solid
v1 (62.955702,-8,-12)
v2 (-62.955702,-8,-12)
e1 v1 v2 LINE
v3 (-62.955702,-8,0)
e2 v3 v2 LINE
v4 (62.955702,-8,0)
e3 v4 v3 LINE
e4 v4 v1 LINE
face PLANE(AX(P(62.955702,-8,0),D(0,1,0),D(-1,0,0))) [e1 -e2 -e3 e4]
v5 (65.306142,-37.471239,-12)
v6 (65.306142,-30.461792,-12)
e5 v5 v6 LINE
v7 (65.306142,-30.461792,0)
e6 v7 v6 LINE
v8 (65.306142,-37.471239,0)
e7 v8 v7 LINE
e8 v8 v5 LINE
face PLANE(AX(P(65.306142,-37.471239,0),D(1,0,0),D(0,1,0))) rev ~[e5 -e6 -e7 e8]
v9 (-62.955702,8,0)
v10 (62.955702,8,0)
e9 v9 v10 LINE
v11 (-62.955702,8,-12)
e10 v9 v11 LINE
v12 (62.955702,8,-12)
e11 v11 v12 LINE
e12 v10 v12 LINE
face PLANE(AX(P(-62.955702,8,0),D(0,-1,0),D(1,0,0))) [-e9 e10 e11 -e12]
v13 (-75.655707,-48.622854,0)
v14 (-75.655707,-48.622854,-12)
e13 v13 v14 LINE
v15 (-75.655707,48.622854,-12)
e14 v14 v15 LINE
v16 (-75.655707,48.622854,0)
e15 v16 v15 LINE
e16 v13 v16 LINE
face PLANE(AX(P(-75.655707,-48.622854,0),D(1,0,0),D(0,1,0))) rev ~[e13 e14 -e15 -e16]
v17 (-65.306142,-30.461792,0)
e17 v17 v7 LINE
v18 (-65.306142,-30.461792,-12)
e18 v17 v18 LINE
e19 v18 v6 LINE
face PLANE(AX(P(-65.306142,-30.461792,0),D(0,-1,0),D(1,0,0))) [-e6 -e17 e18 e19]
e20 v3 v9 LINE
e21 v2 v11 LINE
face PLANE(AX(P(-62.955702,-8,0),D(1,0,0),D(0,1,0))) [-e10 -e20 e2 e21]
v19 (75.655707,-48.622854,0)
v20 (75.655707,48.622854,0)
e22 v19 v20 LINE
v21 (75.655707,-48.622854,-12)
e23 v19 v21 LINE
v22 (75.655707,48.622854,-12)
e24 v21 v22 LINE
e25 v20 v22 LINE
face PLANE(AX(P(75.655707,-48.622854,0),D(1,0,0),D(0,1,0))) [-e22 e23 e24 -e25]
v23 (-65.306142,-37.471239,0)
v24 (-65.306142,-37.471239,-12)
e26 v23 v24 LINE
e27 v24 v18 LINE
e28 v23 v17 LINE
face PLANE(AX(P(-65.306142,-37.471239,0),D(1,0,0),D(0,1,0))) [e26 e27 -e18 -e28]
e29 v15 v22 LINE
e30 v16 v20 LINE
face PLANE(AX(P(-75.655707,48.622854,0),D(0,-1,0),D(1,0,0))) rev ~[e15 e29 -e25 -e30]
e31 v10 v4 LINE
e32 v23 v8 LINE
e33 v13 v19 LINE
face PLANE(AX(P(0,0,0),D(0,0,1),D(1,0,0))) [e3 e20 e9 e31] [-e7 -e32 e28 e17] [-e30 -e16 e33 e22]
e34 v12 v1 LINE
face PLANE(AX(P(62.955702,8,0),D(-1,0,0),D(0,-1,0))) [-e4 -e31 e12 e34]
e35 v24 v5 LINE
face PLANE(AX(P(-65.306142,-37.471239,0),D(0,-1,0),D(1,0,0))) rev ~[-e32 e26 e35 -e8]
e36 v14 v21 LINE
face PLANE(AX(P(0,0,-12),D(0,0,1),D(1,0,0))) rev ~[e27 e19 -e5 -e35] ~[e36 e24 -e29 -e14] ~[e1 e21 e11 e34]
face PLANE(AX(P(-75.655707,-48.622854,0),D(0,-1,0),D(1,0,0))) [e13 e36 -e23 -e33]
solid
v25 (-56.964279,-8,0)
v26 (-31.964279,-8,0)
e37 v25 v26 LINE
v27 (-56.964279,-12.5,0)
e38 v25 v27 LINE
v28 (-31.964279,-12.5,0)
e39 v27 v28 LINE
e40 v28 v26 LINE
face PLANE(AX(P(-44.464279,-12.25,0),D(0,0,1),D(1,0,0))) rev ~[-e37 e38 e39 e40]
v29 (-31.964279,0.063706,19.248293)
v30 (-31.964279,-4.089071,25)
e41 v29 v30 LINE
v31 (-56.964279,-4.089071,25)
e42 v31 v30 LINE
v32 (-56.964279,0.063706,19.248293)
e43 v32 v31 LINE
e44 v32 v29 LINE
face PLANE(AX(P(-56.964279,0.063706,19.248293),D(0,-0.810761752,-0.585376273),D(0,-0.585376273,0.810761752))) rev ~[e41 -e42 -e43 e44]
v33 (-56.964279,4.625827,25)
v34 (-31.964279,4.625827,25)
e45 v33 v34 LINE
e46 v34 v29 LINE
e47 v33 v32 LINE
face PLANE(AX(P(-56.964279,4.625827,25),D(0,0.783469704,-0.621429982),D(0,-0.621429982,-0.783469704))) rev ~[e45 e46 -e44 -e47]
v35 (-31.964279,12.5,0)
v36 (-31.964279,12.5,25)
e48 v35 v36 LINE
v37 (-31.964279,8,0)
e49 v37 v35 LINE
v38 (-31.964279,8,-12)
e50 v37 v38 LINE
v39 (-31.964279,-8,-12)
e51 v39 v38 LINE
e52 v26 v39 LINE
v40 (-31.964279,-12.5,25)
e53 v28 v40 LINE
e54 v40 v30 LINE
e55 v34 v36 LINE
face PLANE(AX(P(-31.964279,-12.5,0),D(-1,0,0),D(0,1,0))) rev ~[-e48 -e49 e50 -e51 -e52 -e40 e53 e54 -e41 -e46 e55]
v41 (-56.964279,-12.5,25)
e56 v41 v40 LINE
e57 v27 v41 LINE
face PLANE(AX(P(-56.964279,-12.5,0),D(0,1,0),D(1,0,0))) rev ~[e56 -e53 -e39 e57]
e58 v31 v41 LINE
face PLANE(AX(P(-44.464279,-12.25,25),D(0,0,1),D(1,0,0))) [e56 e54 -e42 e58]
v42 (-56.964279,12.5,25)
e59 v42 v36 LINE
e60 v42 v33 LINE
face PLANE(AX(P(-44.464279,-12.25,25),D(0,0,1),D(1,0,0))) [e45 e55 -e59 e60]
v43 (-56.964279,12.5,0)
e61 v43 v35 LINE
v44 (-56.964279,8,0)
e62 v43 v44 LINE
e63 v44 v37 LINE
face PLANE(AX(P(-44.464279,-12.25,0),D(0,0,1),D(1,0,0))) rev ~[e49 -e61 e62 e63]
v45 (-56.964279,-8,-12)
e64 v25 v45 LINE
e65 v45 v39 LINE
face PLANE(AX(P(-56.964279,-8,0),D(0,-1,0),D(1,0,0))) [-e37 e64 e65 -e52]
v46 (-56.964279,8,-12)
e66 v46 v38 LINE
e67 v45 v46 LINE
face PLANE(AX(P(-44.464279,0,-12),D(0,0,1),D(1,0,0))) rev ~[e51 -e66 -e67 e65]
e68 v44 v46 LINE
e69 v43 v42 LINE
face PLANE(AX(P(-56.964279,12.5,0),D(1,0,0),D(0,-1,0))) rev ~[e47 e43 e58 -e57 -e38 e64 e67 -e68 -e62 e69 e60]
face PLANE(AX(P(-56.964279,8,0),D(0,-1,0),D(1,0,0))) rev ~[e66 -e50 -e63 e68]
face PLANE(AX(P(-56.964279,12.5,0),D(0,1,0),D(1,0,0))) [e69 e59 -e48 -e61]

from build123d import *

# Parameters (mm, degrees)
F0_W     = 151.3114133903
F0_H     = 97.2457080337
F0_W_2   = 130.6122839451
F0_H_2   = 7.0094466209
F0_W_3   = 25
F0_H_3   = 4
F0_H_4   = 0.5
F1_DEPTH = 12
F0_H_5   = 16
F2_DEPTH = 25
F3_DEPTH = 12
F5_DEPTH = 25


with BuildPart() as f1:
    # F0 (on Top) → F1 (new body)
    with BuildSketch(Plane.XY):
        Rectangle(F0_W, F0_H)
        with Locations((0, -33.9665152133)):
            Rectangle(F0_W_2, F0_H_2, mode=Mode.SUBTRACT)
        Polygon((-66.2499921114, 12), (-56.9642793678, 12), (-56.9642793678, 12.5), (-31.9642793678, 12.5), (-31.9642793678, 12), (66.2499921114, 12), (66.2499921114, -12), (-31.9642793678, -12), (-31.9642793678, -12.5), (-56.9642793678, -12.5), (-56.9642793678, -12), (-66.2499921114, -12), align=None, mode=Mode.SUBTRACT)
        with Locations((-44.4642793678, 10)):
            Rectangle(F0_W_3, F0_H_3)
        Polygon((-62.9557022443, -8), (-62.9557022443, 8), (-56.9642793678, 8), (-56.9642793678, 12), (-66.2499921114, 12), (-66.2499921114, -12), (-56.9642793678, -12), (-56.9642793678, -8), align=None)
        with Locations((-44.4642793678, 12.25)):
            Rectangle(F0_W_3, F0_H_4)
        with Locations((-44.4642793678, -10)):
            Rectangle(F0_W_3, F0_H_3)
        with Locations((-44.4642793678, -12.25)):
            Rectangle(F0_W_3, F0_H_4)
        Polygon((-31.9642793678, 12), (-31.9642793678, 8), (62.9557022443, 8), (62.9557022443, -8), (-31.9642793678, -8), (-31.9642793678, -12), (66.2499921114, -12), (66.2499921114, 12), align=None)
    extrude(amount=-F1_DEPTH)


with BuildPart() as f2:
    # F0 (on Top) → F2 (new body)
    with BuildSketch(Plane.XY):
        with Locations((-44.4642793678, -12.25)):
            Rectangle(F0_W_3, F0_H_4)
        with Locations((-44.4642793678, -10)):
            Rectangle(F0_W_3, F0_H_3)
        with Locations((-44.4642793678, 0)):
            Rectangle(F0_W_3, F0_H_5)
        with Locations((-44.4642793678, 10)):
            Rectangle(F0_W_3, F0_H_3)
        with Locations((-44.4642793678, 12.25)):
            Rectangle(F0_W_3, F0_H_4)
    extrude(amount=F2_DEPTH)

    # F0 (on Top) → F3 (join, through all)
    with BuildSketch(Plane.XY):
        with Locations((-44.4642793678, 0)):
            Rectangle(F0_W_3, F0_H_5)
    extrude(amount=-F3_DEPTH)

    # F4 (on face) → F5 (cut)
    with BuildSketch(Plane(origin=(-56.9642793678, 0, 0), x_dir=(0, -1, 0), z_dir=(-1, 0, 0))):
        Polygon((4.0890707848, 25), (-4.6258270741, 25), (-0.0637064282, 19.2482927877), align=None)
    extrude(amount=-F5_DEPTH, mode=Mode.SUBTRACT)


solid = Compound([f1.part, f2.part])
